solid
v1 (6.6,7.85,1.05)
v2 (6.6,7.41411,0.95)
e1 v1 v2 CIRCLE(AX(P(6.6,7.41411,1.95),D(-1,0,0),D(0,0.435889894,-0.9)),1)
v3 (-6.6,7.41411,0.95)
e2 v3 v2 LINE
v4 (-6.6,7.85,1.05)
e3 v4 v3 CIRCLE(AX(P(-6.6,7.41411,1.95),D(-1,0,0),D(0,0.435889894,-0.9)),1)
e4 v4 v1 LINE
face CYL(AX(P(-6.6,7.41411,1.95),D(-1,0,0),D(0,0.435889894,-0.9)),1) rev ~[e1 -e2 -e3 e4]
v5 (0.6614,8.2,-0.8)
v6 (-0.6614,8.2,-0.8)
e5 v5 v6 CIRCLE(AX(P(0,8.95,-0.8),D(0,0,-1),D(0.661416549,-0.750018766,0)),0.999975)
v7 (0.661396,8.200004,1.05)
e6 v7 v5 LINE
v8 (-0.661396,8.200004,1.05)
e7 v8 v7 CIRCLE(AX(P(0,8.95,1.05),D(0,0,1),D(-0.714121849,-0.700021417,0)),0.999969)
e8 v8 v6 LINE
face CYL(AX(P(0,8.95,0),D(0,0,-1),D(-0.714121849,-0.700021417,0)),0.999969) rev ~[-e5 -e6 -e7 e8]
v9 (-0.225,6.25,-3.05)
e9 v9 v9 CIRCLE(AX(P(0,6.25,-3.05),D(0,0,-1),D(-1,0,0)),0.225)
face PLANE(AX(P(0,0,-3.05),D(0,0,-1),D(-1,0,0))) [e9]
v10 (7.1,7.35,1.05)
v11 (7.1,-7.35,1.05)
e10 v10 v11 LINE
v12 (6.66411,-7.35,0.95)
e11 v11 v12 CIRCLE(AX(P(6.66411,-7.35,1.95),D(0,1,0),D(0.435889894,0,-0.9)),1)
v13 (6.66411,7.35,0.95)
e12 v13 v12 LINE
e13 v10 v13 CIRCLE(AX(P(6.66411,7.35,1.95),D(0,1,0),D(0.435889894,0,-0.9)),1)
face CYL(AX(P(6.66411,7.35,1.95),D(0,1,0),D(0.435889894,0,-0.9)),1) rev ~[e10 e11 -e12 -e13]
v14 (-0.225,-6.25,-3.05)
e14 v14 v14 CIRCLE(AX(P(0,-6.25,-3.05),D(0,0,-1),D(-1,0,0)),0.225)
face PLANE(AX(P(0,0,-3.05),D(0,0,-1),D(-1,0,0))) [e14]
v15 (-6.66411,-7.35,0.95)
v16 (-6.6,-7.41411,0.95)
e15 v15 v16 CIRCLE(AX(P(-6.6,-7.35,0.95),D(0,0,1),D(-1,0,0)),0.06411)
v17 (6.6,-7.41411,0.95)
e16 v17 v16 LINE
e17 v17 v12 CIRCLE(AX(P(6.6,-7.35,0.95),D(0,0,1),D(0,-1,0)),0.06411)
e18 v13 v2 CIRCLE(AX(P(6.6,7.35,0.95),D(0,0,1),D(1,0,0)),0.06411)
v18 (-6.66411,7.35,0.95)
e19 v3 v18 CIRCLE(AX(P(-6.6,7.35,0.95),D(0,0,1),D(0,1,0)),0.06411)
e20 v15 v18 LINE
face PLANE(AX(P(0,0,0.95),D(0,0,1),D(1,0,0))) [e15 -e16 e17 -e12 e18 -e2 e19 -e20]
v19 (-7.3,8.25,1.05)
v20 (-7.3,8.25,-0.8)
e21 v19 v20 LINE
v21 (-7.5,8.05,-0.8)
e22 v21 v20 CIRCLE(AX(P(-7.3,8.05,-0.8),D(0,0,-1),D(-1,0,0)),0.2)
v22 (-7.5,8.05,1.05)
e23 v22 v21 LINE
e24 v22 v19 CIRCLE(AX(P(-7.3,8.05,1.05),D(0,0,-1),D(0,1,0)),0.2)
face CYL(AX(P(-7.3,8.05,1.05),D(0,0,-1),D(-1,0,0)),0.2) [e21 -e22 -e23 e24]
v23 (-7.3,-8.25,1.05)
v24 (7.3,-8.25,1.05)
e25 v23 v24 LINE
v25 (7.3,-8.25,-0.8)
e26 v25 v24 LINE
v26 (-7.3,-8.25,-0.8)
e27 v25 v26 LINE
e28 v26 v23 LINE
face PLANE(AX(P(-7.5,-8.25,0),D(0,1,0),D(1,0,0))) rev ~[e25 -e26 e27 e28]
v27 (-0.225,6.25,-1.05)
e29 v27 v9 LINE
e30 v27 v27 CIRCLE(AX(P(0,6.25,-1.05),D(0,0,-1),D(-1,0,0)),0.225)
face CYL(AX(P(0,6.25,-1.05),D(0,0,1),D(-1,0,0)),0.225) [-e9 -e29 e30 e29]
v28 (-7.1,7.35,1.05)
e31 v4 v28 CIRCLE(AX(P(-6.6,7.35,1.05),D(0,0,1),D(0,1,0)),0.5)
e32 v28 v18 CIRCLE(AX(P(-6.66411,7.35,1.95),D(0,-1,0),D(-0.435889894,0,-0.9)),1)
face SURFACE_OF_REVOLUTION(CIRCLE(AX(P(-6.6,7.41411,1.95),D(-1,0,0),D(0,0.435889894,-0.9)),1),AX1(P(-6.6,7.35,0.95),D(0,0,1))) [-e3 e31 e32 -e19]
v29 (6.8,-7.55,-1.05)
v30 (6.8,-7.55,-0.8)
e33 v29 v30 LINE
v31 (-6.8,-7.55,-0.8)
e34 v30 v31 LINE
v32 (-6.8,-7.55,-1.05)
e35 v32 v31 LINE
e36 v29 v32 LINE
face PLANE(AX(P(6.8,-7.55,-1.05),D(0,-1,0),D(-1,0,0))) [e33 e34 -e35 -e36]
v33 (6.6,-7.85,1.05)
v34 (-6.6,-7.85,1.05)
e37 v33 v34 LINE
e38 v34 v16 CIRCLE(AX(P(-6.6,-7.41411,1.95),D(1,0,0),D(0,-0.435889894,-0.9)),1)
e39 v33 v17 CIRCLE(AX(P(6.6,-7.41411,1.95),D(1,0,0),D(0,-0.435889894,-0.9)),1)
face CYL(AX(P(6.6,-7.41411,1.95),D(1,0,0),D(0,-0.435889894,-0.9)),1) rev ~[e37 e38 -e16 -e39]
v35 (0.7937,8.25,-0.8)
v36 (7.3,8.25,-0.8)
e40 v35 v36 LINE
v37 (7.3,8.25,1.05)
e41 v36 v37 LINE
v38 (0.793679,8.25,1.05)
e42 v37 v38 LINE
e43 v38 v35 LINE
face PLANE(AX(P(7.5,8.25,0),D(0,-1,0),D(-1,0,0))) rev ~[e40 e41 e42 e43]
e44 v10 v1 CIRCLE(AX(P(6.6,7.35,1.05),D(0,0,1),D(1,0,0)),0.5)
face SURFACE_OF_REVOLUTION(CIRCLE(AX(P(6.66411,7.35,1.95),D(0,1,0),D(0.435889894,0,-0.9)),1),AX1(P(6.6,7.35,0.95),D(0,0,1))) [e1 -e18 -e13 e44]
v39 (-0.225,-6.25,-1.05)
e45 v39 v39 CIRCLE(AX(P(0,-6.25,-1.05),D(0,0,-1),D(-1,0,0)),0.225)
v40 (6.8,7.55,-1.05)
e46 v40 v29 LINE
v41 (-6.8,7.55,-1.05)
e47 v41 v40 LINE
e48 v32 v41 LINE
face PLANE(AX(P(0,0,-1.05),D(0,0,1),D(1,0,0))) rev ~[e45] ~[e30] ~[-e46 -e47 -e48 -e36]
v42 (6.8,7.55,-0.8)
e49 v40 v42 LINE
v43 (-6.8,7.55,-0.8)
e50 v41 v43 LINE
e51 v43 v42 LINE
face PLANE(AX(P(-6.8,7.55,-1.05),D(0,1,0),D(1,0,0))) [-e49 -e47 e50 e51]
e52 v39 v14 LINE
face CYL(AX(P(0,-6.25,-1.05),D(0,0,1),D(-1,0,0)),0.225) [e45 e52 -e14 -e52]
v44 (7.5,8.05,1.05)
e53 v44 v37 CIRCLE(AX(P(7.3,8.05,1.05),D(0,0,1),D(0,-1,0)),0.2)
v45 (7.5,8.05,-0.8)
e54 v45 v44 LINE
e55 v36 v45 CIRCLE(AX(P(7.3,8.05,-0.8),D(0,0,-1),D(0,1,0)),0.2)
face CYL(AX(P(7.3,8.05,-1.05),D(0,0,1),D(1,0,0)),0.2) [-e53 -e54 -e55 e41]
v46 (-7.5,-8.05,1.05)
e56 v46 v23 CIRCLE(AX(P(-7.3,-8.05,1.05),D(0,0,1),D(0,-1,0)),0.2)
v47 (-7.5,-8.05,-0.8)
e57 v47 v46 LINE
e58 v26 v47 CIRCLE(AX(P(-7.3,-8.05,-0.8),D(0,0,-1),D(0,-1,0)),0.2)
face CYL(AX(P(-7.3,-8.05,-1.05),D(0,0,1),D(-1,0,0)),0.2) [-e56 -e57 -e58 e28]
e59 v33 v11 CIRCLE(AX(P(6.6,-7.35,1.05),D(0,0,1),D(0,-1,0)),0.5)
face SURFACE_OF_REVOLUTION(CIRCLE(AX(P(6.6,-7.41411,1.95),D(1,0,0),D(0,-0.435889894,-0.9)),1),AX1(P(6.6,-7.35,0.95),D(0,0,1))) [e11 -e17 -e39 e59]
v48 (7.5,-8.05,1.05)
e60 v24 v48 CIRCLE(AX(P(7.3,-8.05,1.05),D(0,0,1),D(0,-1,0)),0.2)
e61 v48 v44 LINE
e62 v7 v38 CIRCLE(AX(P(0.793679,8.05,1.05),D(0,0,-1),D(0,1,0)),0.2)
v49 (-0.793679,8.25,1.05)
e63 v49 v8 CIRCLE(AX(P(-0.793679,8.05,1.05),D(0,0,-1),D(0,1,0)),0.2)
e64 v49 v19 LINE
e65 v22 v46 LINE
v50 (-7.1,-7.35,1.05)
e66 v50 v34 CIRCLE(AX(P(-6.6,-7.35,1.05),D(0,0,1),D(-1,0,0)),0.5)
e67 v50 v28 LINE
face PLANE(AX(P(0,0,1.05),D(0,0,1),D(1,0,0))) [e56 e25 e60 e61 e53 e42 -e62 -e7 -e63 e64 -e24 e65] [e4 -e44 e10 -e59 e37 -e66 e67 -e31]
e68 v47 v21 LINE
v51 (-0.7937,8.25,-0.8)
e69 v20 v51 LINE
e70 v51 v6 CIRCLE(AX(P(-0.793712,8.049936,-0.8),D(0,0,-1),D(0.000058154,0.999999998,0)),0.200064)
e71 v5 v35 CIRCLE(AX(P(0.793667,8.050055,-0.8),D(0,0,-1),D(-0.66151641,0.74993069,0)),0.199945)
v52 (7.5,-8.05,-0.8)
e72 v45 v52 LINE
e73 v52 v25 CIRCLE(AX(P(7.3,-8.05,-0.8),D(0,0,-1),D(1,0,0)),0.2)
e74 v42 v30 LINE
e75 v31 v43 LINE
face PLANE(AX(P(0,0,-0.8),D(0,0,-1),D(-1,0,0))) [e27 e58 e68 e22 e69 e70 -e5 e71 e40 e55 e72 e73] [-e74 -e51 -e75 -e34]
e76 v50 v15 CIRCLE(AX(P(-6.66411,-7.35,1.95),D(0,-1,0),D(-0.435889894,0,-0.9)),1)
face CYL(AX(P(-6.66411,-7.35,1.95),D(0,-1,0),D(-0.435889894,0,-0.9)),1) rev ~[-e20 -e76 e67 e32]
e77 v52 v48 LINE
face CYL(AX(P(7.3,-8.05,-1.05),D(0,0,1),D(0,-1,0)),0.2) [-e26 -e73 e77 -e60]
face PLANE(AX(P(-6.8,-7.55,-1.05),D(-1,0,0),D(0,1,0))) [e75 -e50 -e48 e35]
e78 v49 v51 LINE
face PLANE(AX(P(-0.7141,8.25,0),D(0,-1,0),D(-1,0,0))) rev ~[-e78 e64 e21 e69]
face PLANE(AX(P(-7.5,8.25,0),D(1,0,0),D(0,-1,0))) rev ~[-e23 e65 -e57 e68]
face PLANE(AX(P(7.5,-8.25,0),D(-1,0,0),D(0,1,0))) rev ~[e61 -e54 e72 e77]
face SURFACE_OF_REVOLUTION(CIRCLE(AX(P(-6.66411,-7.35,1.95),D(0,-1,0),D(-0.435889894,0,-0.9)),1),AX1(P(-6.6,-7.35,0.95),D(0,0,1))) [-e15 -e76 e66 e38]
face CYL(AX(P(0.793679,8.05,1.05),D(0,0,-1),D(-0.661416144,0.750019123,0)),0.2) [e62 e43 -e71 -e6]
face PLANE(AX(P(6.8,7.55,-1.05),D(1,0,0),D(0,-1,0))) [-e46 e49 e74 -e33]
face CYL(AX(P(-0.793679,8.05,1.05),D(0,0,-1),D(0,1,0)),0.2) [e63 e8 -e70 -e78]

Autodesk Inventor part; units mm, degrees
ref_plane "YZ Plane" through (0, 0, 0) normal (1, 0, 0) x (0, 1, 0)
ref_plane "XZ Plane" through (0, 0, 0) normal (0, 1, 0) x (-1, 0, 0)
ref_plane "XY Plane" through (0, 0, 0) normal (0, 0, 1) x (1, 0, 0)
sketch "Sketch1" plane through (0, 0, 0) normal (0, 0, 1) x (1, 0, 0)
  line L0 (-7.5, -8.25) -> (7.5, -8.25)
  line L1 (7.5, -8.25) -> (7.5, 8.25)
  line L2 (7.5, 8.25) -> (-7.5, 8.25)
  line L3 (-7.5, 8.25) -> (-7.5, -8.25)
  line L4 (-7.5, -8.25) -> (7.5, 8.25) construction
  line L5 (7.5, -8.25) -> (-7.5, 8.25) construction
  arc A0 (-0.7141, 8.25) -> (0.7141, 8.25) centre (0, 8.95) ccw
  line L6 (0, 7.95) -> (0, 8.25) construction
  point P0 (0, 0)
  dimension "d0" = 15
  dimension "d1" = 16.5
  dimension "d23" = 0.3
  dimension "d24" = 1
extrude "Extrusion1" add sketch "Sketch1" along normal mid plane 2.1 contours L3 L2 A0 L1 L0
fillet "Fillet1" radius 0.2 6 edges at (-7.5, 8.25, 0) (7.5, 8.25, 0) (7.5, -8.25, 0) (-7.5, -8.25, 0) (-0.7141, 8.25, 0) (0.7141, 8.25, 0)
sketch "Sketch2" plane through (0, 0, 1.05) normal (0, 0, 1) x (1, 0, 0)
  arc A0 (-7.5, -8.05) -> (-7.3, -8.25) centre (-7.3, -8.05) ccw projected
  line L0 (-7.3, -8.25) -> (7.3, -8.25) projected
  arc A1 (7.3, -8.25) -> (7.5, -8.05) centre (7.3, -8.05) ccw projected
  line L1 (7.5, -8.05) -> (7.5, 8.05) projected
  arc A2 (7.5, 8.05) -> (7.3, 8.25) centre (7.3, 8.05) ccw projected
  line L2 (7.3, 8.25) -> (0.7937, 8.25) projected
  arc A3 (-7.3, 8.25) -> (-7.5, 8.05) centre (-7.3, 8.05) ccw projected
  line L3 (-7.5, 8.05) -> (-7.5, -8.05) projected
  line L4 (6.6, -7.85) -> (-6.6, -7.85)
  line L5 (-7.1, -7.35) -> (-7.1, 7.35)
  line L6 (-6.6, 7.85) -> (6.6, 7.85)
  line L7 (7.1, 7.35) -> (7.1, -7.35)
  line L8 (7.1, -7.85) -> (-7.1, 7.85) construction
  line L9 (-7.1, -7.85) -> (7.1, 7.85) construction
  arc A4 (-6.6, 7.85) -> (-7.1, 7.35) centre (-6.6, 7.35) ccw
  arc A5 (7.1, 7.35) -> (6.6, 7.85) centre (6.6, 7.35) ccw
  arc A6 (6.6, -7.85) -> (7.1, -7.35) centre (6.6, -7.35) ccw
  arc A7 (-7.1, -7.35) -> (-6.6, -7.85) centre (-6.6, -7.35) ccw
  arc A8 (-0.6614, 8.2) -> (0.6614, 8.2) centre (0, 8.95) ccw projected
  line L10 (-0.7937, 8.25) -> (-7.3, 8.25) projected
  arc A9 (0.7937, 8.25) -> (0.6614, 8.2) centre (0.7937, 8.05) ccw projected
  arc A10 (-0.6614, 8.2) -> (-0.7937, 8.25) centre (-0.7937, 8.05) ccw projected
  point P0 (0, 0)
  dimension "d5" = 0.4
  dimension "d6" = 0.4
  dimension "d7" = 0.5
extrude "Extrusion2" cut sketch "Sketch2" against normal blind 0.1 contours L4 A7 L5 A4 L6 A5 L7 A6
fillet "Fillet2" radius 1 8 edges at (-7.1, 0, 0.95) (-6.9536, 7.7036, 0.95) (0, 7.85, 0.95) (6.9536, 7.7036, 0.95) (7.1, 0, 0.95) (6.9536, -7.7036, 0.95) (0, -7.85, 0.95) (-6.9536, -7.7036, 0.95)
sketch "Sketch4" plane through (0, 0, -1.05) normal (0, 0, -1) x (-1, 0, 0)
  arc A0 (-0.6614, 8.2) -> (-0.7937, 8.25) centre (-0.7937, 8.05) ccw projected
  line L0 (-0.7937, 8.25) -> (-7.3, 8.25) projected
  arc A1 (-7.3, 8.25) -> (-7.5, 8.05) centre (-7.3, 8.05) ccw projected
  line L1 (-7.5, 8.05) -> (-7.5, -8.05) projected
  arc A2 (-7.5, -8.05) -> (-7.3, -8.25) centre (-7.3, -8.05) ccw projected
  line L2 (-7.3, -8.25) -> (7.3, -8.25) projected
  arc A3 (7.3, -8.25) -> (7.5, -8.05) centre (7.3, -8.05) ccw projected
  line L3 (7.5, -8.05) -> (7.5, 8.05) projected
  arc A4 (7.5, 8.05) -> (7.3, 8.25) centre (7.3, 8.05) ccw projected
  line L4 (7.3, 8.25) -> (0.7937, 8.25) projected
  arc A5 (0.7937, 8.25) -> (0.6614, 8.2) centre (0.7937, 8.05) ccw projected
  arc A6 (-0.6614, 8.2) -> (0.6614, 8.2) centre (0, 8.95) ccw projected
  line L5 (-6.8, -7.55) -> (6.8, -7.55)
  line L6 (6.8, -7.55) -> (6.8, 7.55)
  line L7 (6.8, 7.55) -> (-6.8, 7.55)
  line L8 (-6.8, 7.55) -> (-6.8, -7.55)
  line L9 (-6.8, -7.55) -> (6.8, 7.55) construction
  line L10 (6.8, -7.55) -> (-6.8, 7.55) construction
  point P0 (0, 0)
  dimension "d25" = 13.6
  dimension "d26" = 15.1
extrude "Extrusion4" cut sketch "Sketch4" against normal blind 0.25
sketch "Sketch5" plane through (0, 0, -1.05) normal (0, 0, -1) x (-1, 0, 0)
  circle A0 centre (0, 6.25) radius 0.225
  circle A1 centre (0, -6.25) radius 0.225
  line L0 (0, 6.25) -> (0, -6.25) construction
  point P0 (0, 0)
  point P1 (0, 0)
  dimension "d29" = 0.45
  dimension "d30" = 12.5
extrude "Extrusion5" add sketch "Sketch5" along normal blind 2
equation "\"d6\" = d5"
properties part number "Semiconductor_RadiationDiode" material "ABS Plastic"
